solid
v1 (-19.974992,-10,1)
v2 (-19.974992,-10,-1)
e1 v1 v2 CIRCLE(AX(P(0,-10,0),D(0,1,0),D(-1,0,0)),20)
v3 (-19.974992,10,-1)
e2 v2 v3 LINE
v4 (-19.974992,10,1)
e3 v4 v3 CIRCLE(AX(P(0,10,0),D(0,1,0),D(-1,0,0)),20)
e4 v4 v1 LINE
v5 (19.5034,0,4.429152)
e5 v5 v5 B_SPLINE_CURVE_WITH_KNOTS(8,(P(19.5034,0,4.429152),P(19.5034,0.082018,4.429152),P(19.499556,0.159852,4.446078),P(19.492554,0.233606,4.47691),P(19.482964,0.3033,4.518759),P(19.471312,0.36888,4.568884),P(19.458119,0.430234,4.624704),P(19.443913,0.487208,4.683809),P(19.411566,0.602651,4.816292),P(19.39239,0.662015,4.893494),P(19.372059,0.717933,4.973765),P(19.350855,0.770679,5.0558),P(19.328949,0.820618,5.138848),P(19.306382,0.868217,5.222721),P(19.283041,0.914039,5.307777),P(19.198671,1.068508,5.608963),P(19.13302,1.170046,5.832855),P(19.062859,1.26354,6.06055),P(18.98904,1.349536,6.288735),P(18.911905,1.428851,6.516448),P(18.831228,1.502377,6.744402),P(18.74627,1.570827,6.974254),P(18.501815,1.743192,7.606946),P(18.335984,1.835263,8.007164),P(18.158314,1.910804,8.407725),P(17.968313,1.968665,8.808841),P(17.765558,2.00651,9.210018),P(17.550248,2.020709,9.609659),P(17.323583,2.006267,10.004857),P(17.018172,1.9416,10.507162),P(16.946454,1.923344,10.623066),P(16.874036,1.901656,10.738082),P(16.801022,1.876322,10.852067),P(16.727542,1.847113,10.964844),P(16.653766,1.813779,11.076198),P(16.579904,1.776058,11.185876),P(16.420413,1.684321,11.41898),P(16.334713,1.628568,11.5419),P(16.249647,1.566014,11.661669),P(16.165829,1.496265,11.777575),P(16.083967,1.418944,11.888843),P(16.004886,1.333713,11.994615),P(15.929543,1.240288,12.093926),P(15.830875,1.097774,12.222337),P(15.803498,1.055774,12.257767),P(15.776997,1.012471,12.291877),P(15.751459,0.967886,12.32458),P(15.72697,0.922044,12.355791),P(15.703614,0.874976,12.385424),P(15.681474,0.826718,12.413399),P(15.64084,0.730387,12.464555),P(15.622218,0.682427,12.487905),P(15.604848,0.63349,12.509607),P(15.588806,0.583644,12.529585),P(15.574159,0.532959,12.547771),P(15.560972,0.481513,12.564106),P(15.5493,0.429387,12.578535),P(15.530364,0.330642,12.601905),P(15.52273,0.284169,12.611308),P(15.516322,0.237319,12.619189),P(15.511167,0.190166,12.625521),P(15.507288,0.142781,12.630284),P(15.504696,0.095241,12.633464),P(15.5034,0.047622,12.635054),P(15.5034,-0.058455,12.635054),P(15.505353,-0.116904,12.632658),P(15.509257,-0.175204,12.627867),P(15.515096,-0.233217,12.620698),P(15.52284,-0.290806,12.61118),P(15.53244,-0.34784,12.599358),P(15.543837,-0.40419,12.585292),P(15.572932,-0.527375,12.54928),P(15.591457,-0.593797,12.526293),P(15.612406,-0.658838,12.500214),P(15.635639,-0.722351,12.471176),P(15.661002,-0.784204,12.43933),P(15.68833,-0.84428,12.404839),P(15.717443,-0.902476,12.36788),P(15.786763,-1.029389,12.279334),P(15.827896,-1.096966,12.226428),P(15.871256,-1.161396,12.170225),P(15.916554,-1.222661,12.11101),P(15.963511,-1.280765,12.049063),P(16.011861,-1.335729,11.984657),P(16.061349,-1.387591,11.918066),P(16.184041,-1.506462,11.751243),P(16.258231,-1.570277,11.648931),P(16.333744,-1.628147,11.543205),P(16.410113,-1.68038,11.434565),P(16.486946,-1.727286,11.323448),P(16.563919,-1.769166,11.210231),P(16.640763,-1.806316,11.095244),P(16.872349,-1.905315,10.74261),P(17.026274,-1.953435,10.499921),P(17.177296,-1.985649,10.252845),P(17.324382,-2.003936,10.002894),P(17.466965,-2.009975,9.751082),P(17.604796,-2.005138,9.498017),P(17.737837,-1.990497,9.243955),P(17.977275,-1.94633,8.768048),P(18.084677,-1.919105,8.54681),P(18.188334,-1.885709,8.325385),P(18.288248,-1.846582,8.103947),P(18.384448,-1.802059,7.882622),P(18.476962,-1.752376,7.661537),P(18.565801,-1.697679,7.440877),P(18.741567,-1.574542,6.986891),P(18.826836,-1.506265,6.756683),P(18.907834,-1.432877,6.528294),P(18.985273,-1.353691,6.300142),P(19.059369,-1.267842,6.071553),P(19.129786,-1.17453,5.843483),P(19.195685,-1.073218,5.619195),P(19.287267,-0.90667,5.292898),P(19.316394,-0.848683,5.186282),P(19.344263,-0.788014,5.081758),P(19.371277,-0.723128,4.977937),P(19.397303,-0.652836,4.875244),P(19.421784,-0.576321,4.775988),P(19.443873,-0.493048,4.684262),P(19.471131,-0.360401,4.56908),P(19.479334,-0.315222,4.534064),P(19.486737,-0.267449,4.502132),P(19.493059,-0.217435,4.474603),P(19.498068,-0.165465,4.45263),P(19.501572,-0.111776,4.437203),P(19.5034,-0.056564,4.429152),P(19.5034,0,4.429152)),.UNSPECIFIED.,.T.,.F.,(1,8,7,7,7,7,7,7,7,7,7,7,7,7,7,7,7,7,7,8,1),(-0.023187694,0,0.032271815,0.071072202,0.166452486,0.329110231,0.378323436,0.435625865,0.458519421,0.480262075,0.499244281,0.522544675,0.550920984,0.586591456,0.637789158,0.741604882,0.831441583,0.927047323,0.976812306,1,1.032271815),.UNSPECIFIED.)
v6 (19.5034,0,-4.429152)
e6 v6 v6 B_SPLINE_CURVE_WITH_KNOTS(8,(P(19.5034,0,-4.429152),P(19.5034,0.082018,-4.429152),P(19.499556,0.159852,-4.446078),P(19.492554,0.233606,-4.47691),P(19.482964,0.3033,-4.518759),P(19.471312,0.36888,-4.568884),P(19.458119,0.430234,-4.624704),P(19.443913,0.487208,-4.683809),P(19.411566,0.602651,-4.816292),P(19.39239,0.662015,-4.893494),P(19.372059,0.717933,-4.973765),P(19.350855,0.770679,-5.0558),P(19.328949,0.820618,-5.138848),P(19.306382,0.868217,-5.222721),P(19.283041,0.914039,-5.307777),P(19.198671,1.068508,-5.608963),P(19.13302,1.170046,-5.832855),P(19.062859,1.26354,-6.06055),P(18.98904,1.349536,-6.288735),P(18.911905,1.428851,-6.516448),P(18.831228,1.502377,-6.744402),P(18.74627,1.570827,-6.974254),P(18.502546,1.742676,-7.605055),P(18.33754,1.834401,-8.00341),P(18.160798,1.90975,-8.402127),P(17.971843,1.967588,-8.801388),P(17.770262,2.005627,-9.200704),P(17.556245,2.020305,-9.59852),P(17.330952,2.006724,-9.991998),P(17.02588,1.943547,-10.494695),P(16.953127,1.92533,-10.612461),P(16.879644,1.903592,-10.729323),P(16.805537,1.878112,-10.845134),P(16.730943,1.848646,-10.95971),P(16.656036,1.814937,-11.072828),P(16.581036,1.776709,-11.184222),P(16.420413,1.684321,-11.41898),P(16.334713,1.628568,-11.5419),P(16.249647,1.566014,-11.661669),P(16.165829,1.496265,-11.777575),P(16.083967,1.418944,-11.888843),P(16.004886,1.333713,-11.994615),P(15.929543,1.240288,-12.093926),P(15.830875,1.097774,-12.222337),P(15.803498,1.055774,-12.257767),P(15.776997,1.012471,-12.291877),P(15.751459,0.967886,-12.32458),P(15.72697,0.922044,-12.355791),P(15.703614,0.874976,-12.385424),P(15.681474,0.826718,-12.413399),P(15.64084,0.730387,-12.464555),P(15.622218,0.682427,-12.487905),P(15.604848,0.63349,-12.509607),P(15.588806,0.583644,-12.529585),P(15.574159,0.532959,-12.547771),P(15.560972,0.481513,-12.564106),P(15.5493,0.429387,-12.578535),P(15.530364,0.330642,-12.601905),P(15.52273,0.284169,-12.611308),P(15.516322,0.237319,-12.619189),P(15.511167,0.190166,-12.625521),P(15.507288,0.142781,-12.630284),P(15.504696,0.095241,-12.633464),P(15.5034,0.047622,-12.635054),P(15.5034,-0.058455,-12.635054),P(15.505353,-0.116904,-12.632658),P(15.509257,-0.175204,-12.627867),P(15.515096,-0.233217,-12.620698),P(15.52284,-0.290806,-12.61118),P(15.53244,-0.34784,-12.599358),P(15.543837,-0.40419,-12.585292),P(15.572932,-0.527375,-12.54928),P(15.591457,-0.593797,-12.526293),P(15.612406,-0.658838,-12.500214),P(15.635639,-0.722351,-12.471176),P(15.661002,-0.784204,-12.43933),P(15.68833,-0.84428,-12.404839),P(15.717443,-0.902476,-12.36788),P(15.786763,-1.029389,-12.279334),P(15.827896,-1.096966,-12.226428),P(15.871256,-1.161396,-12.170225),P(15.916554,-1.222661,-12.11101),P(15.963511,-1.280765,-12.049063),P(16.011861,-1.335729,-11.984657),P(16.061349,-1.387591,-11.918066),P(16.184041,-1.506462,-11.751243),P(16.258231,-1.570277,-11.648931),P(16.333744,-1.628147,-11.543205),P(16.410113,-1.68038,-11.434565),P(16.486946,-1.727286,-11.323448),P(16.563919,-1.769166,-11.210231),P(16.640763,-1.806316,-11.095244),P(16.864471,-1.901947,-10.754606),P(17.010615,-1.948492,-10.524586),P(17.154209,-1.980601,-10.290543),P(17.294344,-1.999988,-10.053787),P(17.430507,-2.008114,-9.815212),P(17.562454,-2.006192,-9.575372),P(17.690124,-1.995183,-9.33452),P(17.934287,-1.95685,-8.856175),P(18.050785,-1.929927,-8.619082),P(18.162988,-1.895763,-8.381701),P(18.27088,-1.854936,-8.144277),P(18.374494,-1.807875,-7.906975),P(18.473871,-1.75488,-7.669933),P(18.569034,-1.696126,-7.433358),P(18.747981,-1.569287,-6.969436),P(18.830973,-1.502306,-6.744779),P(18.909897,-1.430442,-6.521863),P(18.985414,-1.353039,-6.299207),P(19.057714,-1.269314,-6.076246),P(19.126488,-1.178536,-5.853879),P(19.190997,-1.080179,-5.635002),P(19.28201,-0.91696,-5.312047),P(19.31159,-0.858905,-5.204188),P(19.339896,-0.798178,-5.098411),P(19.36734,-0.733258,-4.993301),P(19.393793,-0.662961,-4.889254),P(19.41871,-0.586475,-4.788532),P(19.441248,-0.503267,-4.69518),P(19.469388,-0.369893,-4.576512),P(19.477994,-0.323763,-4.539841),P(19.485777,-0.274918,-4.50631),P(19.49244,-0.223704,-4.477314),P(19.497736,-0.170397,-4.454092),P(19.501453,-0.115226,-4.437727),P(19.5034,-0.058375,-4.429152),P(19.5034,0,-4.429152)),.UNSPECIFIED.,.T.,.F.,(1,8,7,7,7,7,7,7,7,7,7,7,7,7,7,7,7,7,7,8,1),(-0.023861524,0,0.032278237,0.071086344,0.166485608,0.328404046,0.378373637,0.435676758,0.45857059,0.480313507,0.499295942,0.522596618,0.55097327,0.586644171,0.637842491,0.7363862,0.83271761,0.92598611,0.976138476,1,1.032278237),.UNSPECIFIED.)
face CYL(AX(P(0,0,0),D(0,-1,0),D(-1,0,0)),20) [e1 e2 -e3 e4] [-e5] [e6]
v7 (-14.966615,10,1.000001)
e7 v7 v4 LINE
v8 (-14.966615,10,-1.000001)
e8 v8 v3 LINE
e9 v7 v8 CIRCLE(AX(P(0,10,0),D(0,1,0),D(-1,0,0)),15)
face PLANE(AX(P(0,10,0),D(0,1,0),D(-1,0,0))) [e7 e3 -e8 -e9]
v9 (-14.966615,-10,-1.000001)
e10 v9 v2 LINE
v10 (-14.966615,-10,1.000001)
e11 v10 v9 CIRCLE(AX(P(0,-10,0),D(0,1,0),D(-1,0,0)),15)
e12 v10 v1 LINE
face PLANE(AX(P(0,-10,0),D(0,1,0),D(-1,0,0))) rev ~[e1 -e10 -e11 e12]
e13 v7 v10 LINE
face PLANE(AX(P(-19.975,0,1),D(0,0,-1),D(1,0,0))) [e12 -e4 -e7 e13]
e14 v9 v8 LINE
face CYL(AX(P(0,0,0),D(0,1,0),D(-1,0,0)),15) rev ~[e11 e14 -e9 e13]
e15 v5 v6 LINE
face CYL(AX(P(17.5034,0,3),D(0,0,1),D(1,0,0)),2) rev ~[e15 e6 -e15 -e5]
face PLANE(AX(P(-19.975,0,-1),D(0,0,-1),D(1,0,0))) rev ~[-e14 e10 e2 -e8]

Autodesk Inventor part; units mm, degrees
ref_plane "YZ Plane" through (0, 0, 0) normal (1, 0, 0) x (0, 1, 0)
ref_plane "XZ Plane" through (0, 0, 0) normal (0, 1, 0) x (-1, 0, 0)
sketch "草圖1" plane through (0, 0, 0) normal (0, 1, 0) x (-1, 0, 0)
  circle A0 centre (0, 0) radius 15
  circle A1 centre (0, 0) radius 20
  dimension "d0" = 30
  dimension "d1" = 5
extrude "擠出1" add sketch "草圖1" along normal mid plane 20
sketch "草圖2" plane through (0, 0, 0) normal (0, 0, 1) x (1, 0, 0)
  circle A0 centre (0, 0) radius 3
  dimension "d4" = 6
sketch "草圖3" plane through (0, 0, 0) normal (0, 0, 1) x (1, 0, 0)
  line L0 (-20, -10) -> (20, -10) projected
  line L1 (20, 10) -> (-20, 10) projected
  circle A0 centre (17.5034, 0) radius 1
  line L2 (20, 10) -> (20, -10)
  line L3 (20, -10) -> (20, 10) projected
  line L4 (20, 10) -> (-20, 10) projected
  line L5 (15.0068, 10) -> (20, 10)
  point P0 (0, 0)
  point P1 (20, 0)
  point P2 (17.5034, 10)
  dimension "d5" = 2
extrude "擠出2" cut sketch "草圖3" along normal through all both and the other way through all
sketch "草圖4" plane through (0, 0, 0) normal (0, 1, 0) x (-1, 0, 0)
  circle A0 centre (0, 0) radius 20 projected
  circle A1 centre (0, 0) radius 15 projected
  circle A2 centre (0, 0) radius 20 projected
  line L0 (19.975, -1) -> (14.9666, -1)
  circle A3 centre (0, 0) radius 15 projected
  line L1 (28, 0) -> (-28, 0) projected
  line L2 (19.975, 1) -> (14.9666, 1)
  dimension "d8" = 1
extrude "擠出3" cut sketch "草圖4" along normal through all both and the other way through all contours L1 A1 L2 A0 | A0 L0 A1 L1 picked at (16.6568, 0.5558) picked at (16.6568, -0.5558)
ref_plane "工作平面1" through (0, 0, 3) normal (0, 0, 1) x (1, 0, 0)
sketch "草圖5" plane through (0, 0, 3) normal (0, 0, 1) x (1, 0, 0)
  line L0 (-19.975, 10) -> (-19.975, -10) projected
  line L1 (-19.975, -10) -> (-19.975, -10) projected
  line L2 (-19.975, -10) -> (-19.975, 10) projected
  line L3 (-19.975, 10) -> (-19.975, 10) projected
  spline S0 degree 5 poles (16.5034, 0) (16.5037, -0.3304) (16.6391, -0.6617) (16.9151, -0.9151) (17.5618, -1.1213) (18.1683, -0.8385) (18.3912, -0.5976) (18.6137, -0.0031) (18.395, 0.593) (18.1721, 0.8363) (17.5647, 1.1217) (16.9159, 0.9158) (16.6393, 0.6625) (16.5037, 0.3307) (16.5034, 0) knots 0 0 0 0 0 0 0.26304 0.26304 0.26304 0.499355 0.499355 0.499355 0.736707 0.736707 0.736707 1 1 1 1 1 1 projected
  line L4 (19.7737, 10) -> (19.7737, -10) projected
  line L5 (19.7737, -10) -> (14.6969, -10) projected
  line L6 (14.6969, -10) -> (14.6969, 10) projected
  line L7 (14.6969, 10) -> (19.7737, 10) projected
  circle A0 centre (17.5034, 0) radius 1 projected
  line L8 (-19.7737, -10) -> (-19.7737, 10) projected
  line L9 (-19.7737, 10) -> (-14.6969, 10) projected
  line L10 (-14.6969, 10) -> (-14.6969, -10) projected
  line L11 (-14.6969, -10) -> (-19.7737, -10) projected
  line L12 (14.6969, 10) -> (19.7737, 10)
  line L13 (19.7737, 10) -> (19.7737, -10)
  line L14 (19.7737, -10) -> (14.6969, -10)
  line L15 (14.6969, -10) -> (14.6969, 10)
  circle A1 centre (17.5034, 0) radius 2
  point P0 (0, 0)
  point P1 (18.3303, -0.5624)
  point P2 (19.7737, 0)
  point P3 (17.2353, 10)
  dimension "d15" = 4
extrude "擠出5" cut sketch "草圖5" along normal through all both and the other way through all contours A1
properties part number "0311_練習2"
